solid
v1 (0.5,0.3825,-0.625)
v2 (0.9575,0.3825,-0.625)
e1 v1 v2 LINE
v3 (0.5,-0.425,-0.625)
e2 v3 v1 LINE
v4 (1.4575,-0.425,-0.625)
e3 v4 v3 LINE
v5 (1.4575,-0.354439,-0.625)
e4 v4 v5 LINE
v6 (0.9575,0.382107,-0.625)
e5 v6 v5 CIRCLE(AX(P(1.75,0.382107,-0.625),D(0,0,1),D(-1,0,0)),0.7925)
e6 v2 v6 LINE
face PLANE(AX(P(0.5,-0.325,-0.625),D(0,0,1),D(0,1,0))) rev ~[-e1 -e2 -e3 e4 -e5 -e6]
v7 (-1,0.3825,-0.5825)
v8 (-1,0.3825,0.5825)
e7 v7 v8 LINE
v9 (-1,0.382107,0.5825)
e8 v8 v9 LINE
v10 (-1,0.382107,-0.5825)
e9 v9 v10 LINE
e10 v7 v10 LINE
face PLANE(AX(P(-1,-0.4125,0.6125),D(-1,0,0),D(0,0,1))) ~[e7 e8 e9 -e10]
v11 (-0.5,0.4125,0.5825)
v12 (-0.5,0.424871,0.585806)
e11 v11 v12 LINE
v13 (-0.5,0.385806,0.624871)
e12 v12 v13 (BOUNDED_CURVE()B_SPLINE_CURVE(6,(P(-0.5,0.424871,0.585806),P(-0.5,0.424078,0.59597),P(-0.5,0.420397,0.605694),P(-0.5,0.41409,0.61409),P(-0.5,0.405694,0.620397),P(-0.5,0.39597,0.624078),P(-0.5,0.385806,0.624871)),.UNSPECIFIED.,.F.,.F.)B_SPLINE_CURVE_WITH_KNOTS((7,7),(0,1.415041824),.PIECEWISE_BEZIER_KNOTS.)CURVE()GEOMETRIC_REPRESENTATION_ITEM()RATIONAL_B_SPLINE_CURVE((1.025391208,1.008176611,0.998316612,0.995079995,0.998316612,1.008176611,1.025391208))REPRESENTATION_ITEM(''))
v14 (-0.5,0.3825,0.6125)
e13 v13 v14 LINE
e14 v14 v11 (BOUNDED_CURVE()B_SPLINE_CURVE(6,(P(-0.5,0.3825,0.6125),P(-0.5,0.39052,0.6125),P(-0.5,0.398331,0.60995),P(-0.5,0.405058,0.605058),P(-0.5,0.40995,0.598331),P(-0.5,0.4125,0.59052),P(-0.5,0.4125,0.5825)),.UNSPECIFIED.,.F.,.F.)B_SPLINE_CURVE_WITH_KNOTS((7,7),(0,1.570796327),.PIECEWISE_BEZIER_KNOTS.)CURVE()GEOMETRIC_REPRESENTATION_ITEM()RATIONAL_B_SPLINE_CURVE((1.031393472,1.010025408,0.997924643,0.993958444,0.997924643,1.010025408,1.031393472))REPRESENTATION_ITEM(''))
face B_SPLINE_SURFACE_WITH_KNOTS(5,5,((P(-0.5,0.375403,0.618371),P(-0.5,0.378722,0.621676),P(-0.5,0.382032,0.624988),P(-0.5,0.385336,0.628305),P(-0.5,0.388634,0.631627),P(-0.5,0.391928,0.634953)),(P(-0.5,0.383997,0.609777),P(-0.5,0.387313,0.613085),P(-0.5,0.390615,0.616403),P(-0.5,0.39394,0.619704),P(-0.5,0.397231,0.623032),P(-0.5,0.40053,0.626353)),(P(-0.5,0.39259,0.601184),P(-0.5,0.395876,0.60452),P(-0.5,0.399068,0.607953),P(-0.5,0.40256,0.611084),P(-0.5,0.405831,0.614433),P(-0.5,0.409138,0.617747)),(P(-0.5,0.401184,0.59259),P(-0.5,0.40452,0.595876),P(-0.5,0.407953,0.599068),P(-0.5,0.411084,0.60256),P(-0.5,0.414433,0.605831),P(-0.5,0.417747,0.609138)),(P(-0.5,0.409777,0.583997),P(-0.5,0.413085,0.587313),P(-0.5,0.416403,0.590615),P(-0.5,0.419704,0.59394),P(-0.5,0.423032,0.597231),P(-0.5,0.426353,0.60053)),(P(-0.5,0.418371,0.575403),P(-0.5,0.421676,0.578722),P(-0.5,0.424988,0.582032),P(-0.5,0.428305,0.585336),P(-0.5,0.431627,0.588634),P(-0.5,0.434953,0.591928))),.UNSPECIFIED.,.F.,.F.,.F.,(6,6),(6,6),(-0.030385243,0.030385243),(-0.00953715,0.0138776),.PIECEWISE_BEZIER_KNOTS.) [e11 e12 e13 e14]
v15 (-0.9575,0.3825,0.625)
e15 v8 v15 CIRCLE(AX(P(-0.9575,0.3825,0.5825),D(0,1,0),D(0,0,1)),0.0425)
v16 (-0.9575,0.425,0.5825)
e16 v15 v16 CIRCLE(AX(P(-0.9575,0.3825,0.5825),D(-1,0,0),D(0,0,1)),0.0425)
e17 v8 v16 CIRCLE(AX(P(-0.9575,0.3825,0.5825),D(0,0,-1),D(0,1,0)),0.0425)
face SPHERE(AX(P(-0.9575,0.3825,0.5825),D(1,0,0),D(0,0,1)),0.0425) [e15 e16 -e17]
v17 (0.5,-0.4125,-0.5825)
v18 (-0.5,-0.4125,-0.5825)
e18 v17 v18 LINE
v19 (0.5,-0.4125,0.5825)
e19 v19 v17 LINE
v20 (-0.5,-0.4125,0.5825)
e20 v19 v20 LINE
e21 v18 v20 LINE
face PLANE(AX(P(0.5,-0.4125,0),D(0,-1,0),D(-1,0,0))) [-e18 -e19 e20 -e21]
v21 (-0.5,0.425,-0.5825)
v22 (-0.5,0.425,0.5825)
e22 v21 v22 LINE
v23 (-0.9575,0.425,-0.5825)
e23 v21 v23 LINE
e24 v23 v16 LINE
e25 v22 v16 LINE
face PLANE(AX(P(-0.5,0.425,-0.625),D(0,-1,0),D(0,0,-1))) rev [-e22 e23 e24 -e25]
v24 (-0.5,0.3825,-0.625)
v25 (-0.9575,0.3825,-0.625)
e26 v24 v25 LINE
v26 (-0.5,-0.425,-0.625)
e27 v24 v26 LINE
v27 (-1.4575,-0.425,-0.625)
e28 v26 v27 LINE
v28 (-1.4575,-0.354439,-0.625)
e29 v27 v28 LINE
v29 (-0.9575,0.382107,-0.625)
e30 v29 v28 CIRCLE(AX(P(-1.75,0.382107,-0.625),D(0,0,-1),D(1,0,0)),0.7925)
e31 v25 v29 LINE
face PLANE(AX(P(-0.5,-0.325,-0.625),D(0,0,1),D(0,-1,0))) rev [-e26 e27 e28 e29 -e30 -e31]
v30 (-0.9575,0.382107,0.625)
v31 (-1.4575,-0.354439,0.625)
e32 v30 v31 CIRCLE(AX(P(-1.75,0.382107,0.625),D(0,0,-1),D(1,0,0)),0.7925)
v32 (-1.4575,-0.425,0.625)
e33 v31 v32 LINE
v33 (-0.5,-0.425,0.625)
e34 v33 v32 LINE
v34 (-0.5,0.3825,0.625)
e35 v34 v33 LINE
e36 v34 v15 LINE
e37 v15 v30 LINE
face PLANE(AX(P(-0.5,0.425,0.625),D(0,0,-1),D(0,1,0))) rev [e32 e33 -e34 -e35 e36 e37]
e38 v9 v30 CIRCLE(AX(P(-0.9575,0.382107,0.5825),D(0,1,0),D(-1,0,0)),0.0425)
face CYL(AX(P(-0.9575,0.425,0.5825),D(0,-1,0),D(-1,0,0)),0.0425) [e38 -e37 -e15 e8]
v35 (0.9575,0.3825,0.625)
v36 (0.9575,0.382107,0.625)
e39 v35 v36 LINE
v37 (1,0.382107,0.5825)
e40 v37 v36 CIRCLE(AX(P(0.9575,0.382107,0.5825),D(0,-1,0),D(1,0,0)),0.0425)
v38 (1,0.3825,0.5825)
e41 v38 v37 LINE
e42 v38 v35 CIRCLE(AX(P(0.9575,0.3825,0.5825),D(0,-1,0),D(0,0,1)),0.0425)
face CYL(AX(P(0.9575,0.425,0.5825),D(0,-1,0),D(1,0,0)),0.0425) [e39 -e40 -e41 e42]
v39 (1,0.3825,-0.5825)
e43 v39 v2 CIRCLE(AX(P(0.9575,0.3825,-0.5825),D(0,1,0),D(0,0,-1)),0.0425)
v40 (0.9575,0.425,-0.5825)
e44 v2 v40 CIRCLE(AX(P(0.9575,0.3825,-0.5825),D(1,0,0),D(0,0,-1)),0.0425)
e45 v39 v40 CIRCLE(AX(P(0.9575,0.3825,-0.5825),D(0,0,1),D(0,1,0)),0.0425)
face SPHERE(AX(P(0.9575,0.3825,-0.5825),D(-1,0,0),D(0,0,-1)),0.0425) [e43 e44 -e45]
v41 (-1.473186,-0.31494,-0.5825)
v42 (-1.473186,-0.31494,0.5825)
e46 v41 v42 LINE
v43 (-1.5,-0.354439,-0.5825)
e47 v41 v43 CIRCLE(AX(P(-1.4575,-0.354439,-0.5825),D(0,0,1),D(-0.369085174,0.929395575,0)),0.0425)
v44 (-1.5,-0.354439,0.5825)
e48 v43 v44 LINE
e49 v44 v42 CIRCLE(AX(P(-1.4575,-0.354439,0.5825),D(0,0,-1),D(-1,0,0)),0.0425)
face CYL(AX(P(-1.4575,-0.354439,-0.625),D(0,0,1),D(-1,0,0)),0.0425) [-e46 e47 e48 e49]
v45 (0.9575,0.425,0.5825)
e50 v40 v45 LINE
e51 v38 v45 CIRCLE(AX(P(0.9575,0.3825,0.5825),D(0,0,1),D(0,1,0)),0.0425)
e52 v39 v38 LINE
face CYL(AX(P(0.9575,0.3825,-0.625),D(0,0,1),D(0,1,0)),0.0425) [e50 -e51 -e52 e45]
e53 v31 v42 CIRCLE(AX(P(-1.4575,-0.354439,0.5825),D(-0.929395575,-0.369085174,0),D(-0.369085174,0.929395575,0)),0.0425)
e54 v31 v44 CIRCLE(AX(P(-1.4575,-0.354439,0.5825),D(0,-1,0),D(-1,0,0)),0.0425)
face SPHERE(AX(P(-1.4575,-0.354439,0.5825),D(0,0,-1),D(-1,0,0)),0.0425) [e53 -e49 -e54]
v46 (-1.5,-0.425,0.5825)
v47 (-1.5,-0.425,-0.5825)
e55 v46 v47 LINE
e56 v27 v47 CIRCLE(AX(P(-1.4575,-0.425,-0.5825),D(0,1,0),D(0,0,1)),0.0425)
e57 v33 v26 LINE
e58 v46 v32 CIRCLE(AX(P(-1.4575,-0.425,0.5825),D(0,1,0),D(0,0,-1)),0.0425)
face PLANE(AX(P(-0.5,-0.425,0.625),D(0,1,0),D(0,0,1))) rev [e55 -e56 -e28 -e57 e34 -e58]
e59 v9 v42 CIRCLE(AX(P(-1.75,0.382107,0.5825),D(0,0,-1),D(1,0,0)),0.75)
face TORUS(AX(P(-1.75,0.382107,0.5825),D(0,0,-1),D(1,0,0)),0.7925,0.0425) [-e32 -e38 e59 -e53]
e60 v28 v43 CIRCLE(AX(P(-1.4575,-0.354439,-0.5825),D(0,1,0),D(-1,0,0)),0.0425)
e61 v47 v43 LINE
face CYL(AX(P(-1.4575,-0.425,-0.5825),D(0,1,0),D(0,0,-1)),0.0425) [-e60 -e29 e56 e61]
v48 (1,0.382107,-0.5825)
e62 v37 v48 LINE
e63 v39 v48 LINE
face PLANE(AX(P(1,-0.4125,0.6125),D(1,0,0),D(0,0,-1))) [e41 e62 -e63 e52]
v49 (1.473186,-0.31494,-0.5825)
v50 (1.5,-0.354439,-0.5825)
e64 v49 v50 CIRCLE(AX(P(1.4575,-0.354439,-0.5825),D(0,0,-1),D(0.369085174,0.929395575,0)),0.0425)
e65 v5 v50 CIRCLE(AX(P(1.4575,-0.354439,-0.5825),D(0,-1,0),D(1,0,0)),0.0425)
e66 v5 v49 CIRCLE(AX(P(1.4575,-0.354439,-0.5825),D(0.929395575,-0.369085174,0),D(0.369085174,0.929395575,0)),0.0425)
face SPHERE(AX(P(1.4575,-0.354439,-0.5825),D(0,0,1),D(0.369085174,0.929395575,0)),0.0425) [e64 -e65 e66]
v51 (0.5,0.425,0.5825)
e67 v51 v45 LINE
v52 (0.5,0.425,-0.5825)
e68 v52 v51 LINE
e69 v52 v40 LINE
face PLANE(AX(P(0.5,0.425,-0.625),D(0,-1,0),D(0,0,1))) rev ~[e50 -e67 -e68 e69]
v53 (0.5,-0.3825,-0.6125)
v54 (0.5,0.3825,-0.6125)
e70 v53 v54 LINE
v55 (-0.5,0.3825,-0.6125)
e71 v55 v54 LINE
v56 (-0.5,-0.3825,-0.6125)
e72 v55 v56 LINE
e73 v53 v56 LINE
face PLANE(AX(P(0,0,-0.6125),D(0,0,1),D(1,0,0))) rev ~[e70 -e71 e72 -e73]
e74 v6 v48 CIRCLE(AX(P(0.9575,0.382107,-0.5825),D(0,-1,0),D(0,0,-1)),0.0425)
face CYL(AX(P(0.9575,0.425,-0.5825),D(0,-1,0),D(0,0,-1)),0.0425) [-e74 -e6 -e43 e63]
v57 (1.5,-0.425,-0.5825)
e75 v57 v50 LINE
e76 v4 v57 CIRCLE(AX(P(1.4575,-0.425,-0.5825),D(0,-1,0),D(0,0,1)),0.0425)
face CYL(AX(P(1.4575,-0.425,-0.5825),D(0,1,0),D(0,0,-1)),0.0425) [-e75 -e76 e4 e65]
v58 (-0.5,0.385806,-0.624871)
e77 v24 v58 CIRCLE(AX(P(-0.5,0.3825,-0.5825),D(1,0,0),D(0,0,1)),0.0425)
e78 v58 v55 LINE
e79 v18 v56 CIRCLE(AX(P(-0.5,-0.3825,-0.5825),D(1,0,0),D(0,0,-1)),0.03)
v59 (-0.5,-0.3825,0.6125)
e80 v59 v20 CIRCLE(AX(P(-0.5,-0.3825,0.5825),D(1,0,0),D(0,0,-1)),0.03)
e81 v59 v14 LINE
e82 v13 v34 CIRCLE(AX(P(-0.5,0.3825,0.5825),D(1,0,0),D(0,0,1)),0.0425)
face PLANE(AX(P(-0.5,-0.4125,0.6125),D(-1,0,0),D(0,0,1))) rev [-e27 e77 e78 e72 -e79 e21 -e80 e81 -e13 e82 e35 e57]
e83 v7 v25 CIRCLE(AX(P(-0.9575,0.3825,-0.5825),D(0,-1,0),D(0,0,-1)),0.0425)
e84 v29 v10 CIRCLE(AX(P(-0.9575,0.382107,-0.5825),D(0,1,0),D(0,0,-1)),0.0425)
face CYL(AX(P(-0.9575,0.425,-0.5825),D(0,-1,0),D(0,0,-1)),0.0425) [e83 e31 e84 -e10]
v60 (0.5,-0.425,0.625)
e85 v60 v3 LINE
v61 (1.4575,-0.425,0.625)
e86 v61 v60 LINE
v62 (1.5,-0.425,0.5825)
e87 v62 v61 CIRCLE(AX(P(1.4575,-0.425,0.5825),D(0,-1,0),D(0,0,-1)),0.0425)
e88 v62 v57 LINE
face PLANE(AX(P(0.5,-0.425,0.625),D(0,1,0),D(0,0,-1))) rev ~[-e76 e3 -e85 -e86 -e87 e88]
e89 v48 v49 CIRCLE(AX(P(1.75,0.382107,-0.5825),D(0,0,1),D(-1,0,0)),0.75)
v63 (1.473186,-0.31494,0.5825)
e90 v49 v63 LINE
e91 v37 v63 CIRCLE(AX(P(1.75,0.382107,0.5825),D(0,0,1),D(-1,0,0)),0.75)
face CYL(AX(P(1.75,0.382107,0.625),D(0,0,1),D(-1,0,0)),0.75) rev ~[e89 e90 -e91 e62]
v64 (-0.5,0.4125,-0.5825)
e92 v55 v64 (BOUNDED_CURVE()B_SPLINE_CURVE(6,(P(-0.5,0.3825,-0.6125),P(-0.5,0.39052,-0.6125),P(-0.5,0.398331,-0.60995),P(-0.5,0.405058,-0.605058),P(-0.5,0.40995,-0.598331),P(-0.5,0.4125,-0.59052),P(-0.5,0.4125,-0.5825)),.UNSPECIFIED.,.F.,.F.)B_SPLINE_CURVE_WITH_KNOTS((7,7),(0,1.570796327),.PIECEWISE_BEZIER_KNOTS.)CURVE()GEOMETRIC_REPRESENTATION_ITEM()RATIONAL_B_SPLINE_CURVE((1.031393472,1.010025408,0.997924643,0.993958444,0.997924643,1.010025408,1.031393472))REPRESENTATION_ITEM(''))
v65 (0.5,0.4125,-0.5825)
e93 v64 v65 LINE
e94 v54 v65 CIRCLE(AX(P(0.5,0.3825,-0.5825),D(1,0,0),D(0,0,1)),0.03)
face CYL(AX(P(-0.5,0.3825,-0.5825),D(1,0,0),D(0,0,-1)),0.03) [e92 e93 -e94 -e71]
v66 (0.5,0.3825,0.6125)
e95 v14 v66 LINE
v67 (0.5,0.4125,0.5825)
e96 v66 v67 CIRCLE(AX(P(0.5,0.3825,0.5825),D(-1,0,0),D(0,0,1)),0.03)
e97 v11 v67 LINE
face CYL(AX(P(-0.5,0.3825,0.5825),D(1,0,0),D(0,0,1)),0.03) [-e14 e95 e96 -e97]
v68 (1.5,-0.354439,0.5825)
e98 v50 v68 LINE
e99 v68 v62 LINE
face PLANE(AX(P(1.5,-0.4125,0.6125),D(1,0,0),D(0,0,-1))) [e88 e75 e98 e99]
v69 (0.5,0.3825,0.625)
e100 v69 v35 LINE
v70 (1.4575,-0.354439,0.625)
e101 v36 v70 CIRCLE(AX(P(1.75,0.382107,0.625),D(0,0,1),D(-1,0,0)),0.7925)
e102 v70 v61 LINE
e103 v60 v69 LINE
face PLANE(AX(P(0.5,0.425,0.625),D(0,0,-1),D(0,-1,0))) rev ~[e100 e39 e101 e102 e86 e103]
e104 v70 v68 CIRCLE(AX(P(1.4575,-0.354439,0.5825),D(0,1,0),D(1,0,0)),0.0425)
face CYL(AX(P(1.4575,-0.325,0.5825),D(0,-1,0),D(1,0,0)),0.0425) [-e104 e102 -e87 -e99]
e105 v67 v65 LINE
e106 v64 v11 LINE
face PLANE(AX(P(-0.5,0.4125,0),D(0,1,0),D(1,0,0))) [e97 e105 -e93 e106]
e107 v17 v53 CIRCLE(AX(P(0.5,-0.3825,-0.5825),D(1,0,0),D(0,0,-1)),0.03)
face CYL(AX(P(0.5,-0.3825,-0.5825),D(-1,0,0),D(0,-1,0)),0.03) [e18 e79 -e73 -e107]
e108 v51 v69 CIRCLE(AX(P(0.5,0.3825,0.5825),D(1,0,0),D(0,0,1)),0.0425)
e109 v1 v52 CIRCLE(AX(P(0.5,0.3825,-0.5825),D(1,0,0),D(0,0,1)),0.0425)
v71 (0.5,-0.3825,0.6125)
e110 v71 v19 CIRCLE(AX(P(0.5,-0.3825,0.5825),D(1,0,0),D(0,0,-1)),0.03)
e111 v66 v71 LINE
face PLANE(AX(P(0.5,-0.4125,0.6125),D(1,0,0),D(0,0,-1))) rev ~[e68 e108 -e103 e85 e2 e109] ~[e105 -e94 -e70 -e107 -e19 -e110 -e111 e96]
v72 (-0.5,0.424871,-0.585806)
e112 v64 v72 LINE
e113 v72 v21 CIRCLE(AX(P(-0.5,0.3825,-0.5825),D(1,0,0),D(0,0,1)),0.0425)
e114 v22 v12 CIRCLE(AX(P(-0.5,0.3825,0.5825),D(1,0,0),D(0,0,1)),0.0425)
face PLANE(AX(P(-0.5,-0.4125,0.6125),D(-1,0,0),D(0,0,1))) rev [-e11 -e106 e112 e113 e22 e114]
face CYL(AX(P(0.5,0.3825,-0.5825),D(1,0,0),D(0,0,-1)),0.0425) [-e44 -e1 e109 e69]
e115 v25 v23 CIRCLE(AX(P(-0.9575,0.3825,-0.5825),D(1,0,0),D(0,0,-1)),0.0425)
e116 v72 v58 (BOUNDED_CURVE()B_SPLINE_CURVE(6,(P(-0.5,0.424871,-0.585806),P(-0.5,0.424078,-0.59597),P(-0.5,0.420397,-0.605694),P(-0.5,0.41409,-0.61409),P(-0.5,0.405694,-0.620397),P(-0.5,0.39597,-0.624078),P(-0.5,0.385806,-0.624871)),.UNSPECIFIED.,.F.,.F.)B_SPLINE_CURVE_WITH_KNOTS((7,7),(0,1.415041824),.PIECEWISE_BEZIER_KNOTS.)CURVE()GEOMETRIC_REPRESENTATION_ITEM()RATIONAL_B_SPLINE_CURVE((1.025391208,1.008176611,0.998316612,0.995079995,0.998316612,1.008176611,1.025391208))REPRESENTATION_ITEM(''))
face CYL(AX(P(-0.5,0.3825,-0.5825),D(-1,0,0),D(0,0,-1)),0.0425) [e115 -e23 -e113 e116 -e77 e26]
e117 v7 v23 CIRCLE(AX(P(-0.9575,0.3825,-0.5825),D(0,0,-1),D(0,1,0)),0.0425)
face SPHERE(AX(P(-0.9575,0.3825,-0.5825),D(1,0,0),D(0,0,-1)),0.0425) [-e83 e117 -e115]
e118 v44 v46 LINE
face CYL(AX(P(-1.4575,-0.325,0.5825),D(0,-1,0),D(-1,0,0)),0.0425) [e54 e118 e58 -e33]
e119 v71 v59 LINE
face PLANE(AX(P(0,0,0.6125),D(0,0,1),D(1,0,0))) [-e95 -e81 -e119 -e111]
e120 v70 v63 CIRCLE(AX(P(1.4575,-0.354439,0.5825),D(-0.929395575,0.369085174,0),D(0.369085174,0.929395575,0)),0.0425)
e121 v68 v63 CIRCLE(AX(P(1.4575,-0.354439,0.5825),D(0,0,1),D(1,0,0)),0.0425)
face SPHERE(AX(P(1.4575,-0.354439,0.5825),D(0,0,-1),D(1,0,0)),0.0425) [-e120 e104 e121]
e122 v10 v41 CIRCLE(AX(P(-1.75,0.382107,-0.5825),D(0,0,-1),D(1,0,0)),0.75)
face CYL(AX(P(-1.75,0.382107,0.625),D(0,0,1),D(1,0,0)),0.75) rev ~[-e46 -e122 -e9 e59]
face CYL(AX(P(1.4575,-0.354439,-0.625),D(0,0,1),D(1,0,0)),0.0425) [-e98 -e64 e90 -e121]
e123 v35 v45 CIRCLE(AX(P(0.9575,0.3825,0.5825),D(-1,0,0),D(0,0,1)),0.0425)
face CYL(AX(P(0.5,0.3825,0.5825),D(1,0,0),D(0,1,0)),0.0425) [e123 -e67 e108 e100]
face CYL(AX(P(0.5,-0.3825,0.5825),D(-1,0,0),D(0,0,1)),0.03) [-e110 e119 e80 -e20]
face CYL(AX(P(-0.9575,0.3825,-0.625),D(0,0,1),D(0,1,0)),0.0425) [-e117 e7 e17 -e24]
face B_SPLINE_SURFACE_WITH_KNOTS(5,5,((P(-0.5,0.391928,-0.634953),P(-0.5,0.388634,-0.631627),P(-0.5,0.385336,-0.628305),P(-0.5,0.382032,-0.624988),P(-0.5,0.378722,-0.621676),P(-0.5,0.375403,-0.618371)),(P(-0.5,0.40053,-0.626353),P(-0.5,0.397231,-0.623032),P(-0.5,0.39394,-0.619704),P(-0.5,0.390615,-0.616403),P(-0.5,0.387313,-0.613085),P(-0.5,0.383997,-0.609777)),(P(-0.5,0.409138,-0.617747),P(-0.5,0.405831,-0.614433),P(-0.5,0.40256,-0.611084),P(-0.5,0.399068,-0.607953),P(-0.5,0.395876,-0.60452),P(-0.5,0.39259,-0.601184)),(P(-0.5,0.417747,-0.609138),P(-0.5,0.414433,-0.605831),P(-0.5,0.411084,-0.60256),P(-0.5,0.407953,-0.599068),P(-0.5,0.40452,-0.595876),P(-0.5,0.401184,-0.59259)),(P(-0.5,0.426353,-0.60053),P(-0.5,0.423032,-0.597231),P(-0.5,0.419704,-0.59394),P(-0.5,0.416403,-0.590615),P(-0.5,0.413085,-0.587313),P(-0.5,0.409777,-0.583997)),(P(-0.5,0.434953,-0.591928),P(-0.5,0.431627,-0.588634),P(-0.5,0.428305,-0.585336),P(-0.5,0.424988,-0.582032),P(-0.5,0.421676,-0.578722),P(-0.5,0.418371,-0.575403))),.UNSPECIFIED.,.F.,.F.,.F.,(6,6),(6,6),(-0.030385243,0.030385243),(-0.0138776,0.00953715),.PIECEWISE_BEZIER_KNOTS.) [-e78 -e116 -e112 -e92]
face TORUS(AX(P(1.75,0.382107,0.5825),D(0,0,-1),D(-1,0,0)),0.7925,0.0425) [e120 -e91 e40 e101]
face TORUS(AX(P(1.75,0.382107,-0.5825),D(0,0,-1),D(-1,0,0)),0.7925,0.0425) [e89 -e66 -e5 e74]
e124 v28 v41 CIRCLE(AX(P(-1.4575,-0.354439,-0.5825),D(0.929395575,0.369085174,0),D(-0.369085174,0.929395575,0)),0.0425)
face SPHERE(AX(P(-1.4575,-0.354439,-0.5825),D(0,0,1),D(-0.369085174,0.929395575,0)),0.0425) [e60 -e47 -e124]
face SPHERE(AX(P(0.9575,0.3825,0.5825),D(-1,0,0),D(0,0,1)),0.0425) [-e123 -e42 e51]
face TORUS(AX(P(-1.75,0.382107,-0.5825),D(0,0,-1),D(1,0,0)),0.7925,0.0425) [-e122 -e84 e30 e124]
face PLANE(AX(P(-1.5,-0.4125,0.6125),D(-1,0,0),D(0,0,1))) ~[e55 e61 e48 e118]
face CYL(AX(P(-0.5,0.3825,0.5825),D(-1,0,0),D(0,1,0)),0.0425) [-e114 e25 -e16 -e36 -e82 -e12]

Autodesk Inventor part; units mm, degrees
ref_plane "YZ Plane" through (0, 0, 0) normal (1, 0, 0) x (0, 1, 0)
ref_plane "XZ Plane" through (0, 0, 0) normal (0, 1, 0) x (-1, 0, 0)
ref_plane "XY Plane" through (0, 0, 0) normal (0, 0, 1) x (1, 0, 0)
sketch "Sketch10" plane through (0, 0, 0) normal (0, 0, 1) x (1, 0, 0)
  line L0 (-0.5, 0.4125) -> (0.5, 0.4125)
  line L1 (0.5, 0.4125) -> (0.5, -0.4125)
  line L2 (0.5, -0.4125) -> (-0.5, -0.4125)
  line L3 (-0.5, -0.4125) -> (-0.5, 0.4125)
  point P0 (0, 0)
  point P1 (-0.5, 0)
  point P2 (0, 0.4125)
  dimension "d7" = 1
  dimension "d8" = 0.825
extrude "Extrusion4" add sketch "Sketch10" along normal mid plane 1.225
sketch "Sketch11" plane through (0.5, -0.4125, 0.6125) normal (1, 0, 0) x (0, 0, -1)
  line L0 (0, 0.825) -> (1.225, 0.825) construction
  line L1 (0, 0) -> (0, 0.825) construction
  line L2 (0, 0) -> (1.225, 0) construction
  line L3 (1.225, 0.825) -> (1.225, 0) construction
  line L4 (1.2375, 0.8375) -> (-0.0125, 0.8375)
  line L5 (-0.0125, 0.8375) -> (-0.0125, -0.0125)
  line L6 (-0.0125, -0.0125) -> (1.2375, -0.0125)
  line L7 (1.2375, -0.0125) -> (1.2375, 0.8375)
  line L8 (-0.0125, -0.0125) -> (1.2375, -0.0125)
  line L9 (1.2375, -0.0125) -> (1.2375, 0.0875)
  line L10 (1.2375, 0.0875) -> (-0.0125, 0.0875)
  line L11 (-0.0125, 0.0875) -> (-0.0125, -0.0125)
  point P0 (0.6125, 0.4125)
  dimension "d11" = 1.25
  dimension "d14" = 0.1
extrude "Extrusion5" add sketch "Sketch11" along normal blind 0.5
extrude "Extrusion6" add sketch "Sketch11" along normal blind 1 contours L7 L6 L5 L10
fillet "Fillet1" radius 0.75 1 edges at (1, -0.325, 0)
fillet "Fillet2" radius 0.0425 10 edges at (0.75, 0.425, -0.625) (0.75, 0.425, 0.625) (1, 0.4036, 0.625) (1.1376, -0.0509, 0.625) (1, 0.4036, -0.625) (1.1376, -0.0509, -0.625) (1.5, -0.375, -0.625) (1.5, -0.325, 0) (1, 0.425, 0) (1.5, -0.375, 0.625)
mirror "Mirror1" about plane through (0, 0, 0) normal (1, 0, 0) of "Extrusion5", "Fillet1", "Fillet2", "Extrusion6"
fillet "Fillet3" radius 0.03 4 edges at (0, 0.4125, -0.6125) (0, 0.4125, 0.6125) (0, -0.4125, -0.6125) (0, -0.4125, 0.6125)
properties part number "CL21A226MQCLQNC Capacitor" material "Laminate, Ivory, Matte"
